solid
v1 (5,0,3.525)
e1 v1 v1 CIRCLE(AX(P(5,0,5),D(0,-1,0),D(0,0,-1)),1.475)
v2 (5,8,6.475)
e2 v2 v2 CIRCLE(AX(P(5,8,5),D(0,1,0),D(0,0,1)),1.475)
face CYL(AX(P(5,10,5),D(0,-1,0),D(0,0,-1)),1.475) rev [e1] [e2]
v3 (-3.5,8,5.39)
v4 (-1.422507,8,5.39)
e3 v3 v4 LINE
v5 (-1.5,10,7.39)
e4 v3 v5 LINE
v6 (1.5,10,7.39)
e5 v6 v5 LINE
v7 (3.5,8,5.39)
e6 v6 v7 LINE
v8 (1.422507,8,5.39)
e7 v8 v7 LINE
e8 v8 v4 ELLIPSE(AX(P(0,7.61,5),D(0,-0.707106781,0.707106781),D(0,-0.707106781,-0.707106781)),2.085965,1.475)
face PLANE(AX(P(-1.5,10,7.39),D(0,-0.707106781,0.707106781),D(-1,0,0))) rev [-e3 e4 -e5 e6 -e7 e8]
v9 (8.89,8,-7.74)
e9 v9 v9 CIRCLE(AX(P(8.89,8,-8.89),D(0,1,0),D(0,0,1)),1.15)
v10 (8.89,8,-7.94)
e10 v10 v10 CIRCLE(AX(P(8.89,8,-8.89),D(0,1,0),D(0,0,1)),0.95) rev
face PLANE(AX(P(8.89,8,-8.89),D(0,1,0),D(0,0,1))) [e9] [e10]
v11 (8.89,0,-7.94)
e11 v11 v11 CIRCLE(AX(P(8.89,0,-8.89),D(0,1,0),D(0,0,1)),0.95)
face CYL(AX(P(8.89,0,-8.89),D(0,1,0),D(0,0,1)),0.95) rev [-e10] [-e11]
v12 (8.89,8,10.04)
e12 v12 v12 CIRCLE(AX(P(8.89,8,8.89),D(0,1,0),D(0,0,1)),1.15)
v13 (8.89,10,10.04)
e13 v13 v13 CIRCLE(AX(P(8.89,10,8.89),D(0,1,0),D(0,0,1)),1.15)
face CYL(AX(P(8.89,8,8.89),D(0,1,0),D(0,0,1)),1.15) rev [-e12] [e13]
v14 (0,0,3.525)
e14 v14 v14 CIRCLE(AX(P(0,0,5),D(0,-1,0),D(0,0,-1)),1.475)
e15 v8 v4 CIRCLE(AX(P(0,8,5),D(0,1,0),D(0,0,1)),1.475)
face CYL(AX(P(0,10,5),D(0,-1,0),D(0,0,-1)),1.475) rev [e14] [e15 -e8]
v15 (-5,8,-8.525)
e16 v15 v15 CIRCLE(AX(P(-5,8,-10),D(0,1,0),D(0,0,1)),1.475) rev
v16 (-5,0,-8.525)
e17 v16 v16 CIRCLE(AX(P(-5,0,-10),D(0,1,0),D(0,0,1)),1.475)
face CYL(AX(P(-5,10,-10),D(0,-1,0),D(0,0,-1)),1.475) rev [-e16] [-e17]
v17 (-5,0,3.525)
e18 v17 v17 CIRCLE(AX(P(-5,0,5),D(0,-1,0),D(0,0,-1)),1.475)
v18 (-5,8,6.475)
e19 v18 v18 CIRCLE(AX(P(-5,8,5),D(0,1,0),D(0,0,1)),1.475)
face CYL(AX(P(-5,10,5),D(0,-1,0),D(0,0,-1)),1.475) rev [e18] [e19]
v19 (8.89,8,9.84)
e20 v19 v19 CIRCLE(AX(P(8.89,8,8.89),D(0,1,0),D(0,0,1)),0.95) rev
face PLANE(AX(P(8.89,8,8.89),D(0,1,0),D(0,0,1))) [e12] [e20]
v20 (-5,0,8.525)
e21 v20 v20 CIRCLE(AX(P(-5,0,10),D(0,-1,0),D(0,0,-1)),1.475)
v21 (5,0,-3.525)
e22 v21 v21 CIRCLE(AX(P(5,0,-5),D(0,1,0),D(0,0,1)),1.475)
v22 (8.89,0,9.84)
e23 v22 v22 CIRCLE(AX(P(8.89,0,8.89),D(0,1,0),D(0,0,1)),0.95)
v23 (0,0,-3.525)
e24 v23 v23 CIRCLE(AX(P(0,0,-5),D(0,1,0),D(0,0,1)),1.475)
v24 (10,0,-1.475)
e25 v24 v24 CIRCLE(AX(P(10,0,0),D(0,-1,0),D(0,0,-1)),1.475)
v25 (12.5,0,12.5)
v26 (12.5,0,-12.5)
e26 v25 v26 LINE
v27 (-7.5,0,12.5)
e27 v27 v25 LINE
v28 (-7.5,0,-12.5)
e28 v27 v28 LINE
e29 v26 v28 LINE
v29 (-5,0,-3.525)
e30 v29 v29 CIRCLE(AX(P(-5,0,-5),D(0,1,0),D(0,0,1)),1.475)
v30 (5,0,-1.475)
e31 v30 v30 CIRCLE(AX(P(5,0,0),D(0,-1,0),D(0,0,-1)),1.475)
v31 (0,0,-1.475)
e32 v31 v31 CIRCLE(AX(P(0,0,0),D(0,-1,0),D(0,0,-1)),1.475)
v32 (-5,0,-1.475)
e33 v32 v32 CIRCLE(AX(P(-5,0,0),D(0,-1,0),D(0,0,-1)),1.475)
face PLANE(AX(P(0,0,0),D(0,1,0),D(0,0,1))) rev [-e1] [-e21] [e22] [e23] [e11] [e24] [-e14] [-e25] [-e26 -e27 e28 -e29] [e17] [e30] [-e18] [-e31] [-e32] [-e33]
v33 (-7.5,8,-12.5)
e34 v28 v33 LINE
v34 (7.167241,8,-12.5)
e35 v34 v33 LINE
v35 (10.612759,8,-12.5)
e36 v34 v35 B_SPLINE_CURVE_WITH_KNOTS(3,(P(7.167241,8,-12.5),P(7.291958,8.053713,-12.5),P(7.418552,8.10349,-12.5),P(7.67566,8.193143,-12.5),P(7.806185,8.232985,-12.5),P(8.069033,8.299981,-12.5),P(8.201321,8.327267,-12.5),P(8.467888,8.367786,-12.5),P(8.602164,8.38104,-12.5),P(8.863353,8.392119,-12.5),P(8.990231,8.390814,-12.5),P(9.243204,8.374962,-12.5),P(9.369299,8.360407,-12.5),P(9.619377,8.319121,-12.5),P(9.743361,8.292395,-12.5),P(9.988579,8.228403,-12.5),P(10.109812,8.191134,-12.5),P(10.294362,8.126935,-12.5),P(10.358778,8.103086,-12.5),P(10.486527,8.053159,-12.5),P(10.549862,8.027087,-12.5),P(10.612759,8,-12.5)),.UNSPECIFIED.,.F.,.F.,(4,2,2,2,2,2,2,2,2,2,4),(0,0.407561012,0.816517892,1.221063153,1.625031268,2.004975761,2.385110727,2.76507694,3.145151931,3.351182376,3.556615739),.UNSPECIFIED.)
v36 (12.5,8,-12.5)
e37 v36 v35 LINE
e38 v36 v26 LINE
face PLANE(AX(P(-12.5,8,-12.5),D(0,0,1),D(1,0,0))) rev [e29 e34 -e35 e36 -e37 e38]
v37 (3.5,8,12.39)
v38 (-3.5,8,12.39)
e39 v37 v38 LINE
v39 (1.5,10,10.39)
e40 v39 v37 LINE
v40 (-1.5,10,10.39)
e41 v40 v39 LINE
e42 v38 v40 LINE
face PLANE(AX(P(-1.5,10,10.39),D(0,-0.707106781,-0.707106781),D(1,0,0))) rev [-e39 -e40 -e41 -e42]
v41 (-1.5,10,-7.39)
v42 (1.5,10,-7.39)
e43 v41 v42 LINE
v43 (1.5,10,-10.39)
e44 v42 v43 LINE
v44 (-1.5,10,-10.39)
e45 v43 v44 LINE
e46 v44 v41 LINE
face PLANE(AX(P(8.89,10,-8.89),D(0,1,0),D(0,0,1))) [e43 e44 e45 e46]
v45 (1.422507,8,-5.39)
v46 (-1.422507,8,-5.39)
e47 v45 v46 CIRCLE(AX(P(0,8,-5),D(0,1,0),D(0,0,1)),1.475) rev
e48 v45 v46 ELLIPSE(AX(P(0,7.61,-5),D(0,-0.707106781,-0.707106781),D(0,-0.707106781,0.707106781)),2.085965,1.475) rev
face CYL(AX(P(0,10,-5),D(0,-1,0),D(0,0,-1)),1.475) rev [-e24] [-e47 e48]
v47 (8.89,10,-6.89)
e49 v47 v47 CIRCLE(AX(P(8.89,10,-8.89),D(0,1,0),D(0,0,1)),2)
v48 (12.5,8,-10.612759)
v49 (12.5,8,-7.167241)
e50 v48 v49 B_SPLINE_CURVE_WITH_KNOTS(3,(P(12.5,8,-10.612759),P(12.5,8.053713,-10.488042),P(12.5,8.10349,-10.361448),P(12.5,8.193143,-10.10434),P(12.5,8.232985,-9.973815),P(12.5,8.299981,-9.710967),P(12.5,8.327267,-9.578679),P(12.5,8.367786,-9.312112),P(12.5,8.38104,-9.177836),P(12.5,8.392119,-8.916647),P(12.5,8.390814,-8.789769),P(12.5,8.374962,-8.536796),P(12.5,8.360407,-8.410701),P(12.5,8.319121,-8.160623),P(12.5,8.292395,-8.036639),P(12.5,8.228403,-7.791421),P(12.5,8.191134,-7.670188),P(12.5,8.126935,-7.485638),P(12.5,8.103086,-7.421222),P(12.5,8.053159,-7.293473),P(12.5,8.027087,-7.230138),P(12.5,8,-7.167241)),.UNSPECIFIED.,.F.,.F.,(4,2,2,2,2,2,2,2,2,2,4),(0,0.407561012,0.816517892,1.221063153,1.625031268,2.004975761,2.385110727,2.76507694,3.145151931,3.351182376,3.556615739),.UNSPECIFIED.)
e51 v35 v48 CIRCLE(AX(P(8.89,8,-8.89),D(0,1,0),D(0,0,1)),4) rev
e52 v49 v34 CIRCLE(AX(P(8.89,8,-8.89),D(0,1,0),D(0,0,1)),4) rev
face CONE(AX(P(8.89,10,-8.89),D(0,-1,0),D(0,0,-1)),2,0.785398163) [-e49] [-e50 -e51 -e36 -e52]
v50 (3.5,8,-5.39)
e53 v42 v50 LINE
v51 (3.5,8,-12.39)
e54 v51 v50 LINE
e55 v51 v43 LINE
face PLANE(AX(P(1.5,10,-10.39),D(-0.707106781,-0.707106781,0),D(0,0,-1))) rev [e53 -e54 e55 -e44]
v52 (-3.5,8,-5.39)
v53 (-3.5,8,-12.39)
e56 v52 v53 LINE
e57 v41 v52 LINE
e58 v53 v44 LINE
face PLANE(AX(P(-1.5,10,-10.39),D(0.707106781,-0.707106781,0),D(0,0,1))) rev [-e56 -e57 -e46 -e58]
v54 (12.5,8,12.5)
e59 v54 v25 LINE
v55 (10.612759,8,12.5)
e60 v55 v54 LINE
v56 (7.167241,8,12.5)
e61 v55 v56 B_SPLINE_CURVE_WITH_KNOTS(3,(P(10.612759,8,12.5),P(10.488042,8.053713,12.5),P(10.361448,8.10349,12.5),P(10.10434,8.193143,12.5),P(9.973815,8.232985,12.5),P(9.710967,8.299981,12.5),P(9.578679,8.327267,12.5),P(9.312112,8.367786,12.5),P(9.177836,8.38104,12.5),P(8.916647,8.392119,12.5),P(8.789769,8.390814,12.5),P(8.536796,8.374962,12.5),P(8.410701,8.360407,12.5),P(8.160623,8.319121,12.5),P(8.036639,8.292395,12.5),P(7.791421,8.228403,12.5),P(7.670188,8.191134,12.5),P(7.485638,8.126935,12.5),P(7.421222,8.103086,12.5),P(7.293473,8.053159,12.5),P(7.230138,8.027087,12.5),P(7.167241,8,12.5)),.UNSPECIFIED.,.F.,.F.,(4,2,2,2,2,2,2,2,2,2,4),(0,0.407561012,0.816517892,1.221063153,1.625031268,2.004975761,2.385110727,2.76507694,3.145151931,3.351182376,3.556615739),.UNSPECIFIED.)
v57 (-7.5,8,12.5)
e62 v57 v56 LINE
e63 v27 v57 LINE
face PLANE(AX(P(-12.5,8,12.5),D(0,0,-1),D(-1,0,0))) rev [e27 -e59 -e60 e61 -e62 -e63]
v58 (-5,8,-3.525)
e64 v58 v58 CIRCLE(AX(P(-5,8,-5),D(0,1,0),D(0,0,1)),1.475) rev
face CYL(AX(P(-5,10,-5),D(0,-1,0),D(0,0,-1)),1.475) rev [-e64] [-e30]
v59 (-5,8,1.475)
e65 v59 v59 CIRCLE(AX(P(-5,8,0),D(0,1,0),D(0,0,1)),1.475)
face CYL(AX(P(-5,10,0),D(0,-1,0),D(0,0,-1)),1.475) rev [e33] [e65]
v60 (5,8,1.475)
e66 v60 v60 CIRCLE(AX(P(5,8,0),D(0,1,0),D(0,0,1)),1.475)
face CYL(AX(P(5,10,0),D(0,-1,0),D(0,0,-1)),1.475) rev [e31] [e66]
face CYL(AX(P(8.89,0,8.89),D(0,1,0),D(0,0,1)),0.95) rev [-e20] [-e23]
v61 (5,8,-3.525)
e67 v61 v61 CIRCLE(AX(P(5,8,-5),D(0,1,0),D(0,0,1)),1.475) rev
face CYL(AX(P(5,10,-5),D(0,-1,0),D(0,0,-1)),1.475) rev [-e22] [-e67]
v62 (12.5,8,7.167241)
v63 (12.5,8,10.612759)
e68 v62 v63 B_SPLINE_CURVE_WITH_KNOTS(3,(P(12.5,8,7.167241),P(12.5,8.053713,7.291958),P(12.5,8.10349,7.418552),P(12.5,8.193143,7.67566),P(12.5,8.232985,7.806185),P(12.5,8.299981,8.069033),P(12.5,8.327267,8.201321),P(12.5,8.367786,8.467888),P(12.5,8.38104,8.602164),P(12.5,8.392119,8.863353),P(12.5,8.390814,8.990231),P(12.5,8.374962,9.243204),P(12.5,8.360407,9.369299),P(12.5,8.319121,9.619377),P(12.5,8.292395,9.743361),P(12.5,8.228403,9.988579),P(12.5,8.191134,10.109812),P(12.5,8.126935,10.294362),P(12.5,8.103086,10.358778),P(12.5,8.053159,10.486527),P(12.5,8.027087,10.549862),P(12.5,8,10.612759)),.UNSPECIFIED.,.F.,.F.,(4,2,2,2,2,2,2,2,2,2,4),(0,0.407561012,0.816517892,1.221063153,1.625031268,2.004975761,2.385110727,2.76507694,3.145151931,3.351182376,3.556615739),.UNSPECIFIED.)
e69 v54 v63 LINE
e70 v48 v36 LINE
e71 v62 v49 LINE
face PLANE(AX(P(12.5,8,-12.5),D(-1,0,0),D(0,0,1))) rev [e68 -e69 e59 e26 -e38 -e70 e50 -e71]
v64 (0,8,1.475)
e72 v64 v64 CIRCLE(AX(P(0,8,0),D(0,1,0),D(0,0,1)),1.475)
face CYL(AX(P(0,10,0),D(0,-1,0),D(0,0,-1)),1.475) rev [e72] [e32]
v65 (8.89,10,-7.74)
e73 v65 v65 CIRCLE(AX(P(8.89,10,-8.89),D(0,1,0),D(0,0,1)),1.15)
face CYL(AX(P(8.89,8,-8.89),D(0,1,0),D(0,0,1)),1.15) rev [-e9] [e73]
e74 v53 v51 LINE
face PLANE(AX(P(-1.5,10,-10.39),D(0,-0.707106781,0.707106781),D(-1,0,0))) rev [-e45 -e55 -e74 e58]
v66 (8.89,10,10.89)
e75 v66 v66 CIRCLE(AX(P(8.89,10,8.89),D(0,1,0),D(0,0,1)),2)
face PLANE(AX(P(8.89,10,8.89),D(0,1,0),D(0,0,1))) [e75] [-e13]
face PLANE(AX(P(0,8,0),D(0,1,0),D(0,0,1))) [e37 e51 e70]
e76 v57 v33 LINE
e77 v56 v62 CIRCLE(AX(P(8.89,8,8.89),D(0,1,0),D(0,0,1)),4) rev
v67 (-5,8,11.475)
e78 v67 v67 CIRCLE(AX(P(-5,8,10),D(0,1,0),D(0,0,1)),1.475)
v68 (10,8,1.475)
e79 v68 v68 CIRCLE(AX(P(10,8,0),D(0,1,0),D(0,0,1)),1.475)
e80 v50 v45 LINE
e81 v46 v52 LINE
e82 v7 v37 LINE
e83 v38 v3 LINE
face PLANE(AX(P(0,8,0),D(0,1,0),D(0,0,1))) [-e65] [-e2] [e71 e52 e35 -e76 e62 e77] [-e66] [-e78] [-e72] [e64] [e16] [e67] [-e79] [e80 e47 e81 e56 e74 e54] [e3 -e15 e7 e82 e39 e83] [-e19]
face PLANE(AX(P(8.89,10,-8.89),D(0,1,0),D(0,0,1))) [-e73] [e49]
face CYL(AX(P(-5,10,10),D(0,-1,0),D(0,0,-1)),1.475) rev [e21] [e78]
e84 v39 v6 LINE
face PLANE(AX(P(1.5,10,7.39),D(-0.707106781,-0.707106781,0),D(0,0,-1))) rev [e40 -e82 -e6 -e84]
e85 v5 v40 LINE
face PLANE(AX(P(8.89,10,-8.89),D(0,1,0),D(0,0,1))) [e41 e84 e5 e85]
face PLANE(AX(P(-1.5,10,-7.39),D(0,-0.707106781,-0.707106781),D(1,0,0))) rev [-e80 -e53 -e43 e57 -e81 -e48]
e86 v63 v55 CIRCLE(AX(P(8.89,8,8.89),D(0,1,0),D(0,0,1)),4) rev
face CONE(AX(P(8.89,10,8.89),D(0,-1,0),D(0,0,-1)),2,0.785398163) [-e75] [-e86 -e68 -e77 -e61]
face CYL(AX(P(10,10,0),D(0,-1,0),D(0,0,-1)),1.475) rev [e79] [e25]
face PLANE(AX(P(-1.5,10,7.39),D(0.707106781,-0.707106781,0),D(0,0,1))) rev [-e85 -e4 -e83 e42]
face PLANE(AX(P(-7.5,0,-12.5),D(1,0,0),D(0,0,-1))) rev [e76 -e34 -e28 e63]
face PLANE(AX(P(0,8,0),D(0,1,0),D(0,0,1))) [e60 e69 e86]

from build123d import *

# Parameters (mm, degrees)
SKETCH1_W                = 25
SKETCH1_H                = 25
BOSS_EXTRUDE1_DEPTH      = 8
SKETCH2_R                = 0.95
CUT_EXTRUDE1_DEPTH       = 20.403607912
BOSS_EXTRUDE2_START      = 2
SKETCH3_R                = 2
SKETCH3_R_2              = 0.95
BOSS_EXTRUDE2_DEPTH      = 2
SKETCH6_W                = 3
SKETCH6_H                = 3
BOSS_EXTRUDE3_DEPTH      = 2
CHAMFER1_SIZE            = 2
SKETCH4_R                = 1.475
CUT_EXTRUDE2_DEPTH       = 21.310096012
LPATTERN1_COUNT          = 5
LPATTERN1_PITCH          = 5
LPATTERN1_COUNT_DIR2     = 3
LPATTERN1_PITCH_DIR2     = 5
MIRROR1_COPY_1_SKETCH_R  = 1.475
MIRROR1_COPY_1_DEPTH     = 21.310096012
MIRROR1_COPY_2_SKETCH_R  = 1.475
MIRROR1_COPY_2_DEPTH     = 21.310096012
MIRROR1_COPY_3_SKETCH_R  = 1.475
MIRROR1_COPY_3_DEPTH     = 21.310096012
MIRROR1_COPY_4_SKETCH_R  = 1.475
MIRROR1_COPY_4_DEPTH     = 21.310096012
MIRROR1_COPY_5_SKETCH_R  = 1.475
MIRROR1_COPY_5_DEPTH     = 21.310096012
MIRROR1_COPY_6_SKETCH_R  = 1.475
MIRROR1_COPY_6_DEPTH     = 21.310096012
MIRROR1_COPY_7_SKETCH_R  = 1.475
MIRROR1_COPY_7_DEPTH     = 21.310096012
MIRROR1_COPY_8_SKETCH_R  = 1.475
MIRROR1_COPY_8_DEPTH     = 21.310096012
MIRROR1_COPY_9_SKETCH_R  = 1.475
MIRROR1_COPY_9_DEPTH     = 21.310096012
MIRROR1_COPY_10_SKETCH_R = 1.475
MIRROR1_COPY_10_DEPTH    = 21.310096012
MIRROR1_COPY_11_SKETCH_R = 1.475
MIRROR1_COPY_11_DEPTH    = 21.310096012
SKETCH5_R                = 1.15
CUT_EXTRUDE3_DEPTH       = 2
SKETCH7_W                = 5
SKETCH7_H                = 25
CUT_EXTRUDE4_DEPTH       = 20.403607912


with BuildPart() as part:
    # Sketch1 → Boss-Extrude1 (new body)
    with BuildSketch(Plane(origin=(0, 0, 0), x_dir=(1, 0, 0), z_dir=(0, 1, 0))):
        Rectangle(SKETCH1_W, SKETCH1_H)
    extrude(amount=BOSS_EXTRUDE1_DEPTH)

    # Sketch2 → Cut-Extrude1 (cut, through all)
    with BuildSketch(Plane(origin=(0, 8, 0), x_dir=(1, 0, 0), z_dir=(0, 1, 0))):
        with Locations(Location((8.89, -8.89, 0), (0, 0, 270))):
            Circle(SKETCH2_R)
        with Locations(Location((8.89, 8.89, 0), (0, 0, 270))):
            Circle(SKETCH2_R)
    extrude(amount=-CUT_EXTRUDE1_DEPTH, mode=Mode.SUBTRACT)

    # Sketch3 → Boss-Extrude2 (add)
    # profile 1 of 2: a face of its own
    with BuildSketch(Plane(origin=(0, 8, 0), x_dir=(1, 0, 0), z_dir=(0, 1, 0)).offset(BOSS_EXTRUDE2_START)):
        with Locations(Location((8.89, 8.89, 0), (0, 0, 270))):
            Circle(SKETCH3_R)
        with Locations(Location((8.89, 8.89, 0), (0, 0, 270))):
            Circle(SKETCH3_R_2, mode=Mode.SUBTRACT)
    # profile 2 of 2: a face of its own
    with BuildSketch(Plane(origin=(0, 8, 0), x_dir=(1, 0, 0), z_dir=(0, 1, 0)).offset(BOSS_EXTRUDE2_START)):
        with Locations(Location((8.89, -8.89, 0), (0, 0, 270))):
            Circle(SKETCH3_R)
        with Locations(Location((8.89, -8.89, 0), (0, 0, 270))):
            Circle(SKETCH3_R_2, mode=Mode.SUBTRACT)
    extrude(amount=-BOSS_EXTRUDE2_DEPTH)

    # Sketch6 → Boss-Extrude3 (add)
    with BuildSketch(Plane(origin=(0, 8, 0), x_dir=(1, 0, 0), z_dir=(0, 1, 0))):
        with Locations((0, 8.89)):
            Rectangle(SKETCH6_W, SKETCH6_H)
        with Locations((0, -8.89)):
            Rectangle(SKETCH6_W, SKETCH6_H)
    extrude(amount=BOSS_EXTRUDE3_DEPTH)

    # Chamfer1
    # the kernel refuses this chamfer: 2 mm, written as the material it adds along each edge
    with BuildSketch(Plane(origin=(8.89, 8, -8.89), x_dir=(0, 0, 1), z_dir=(-1, 0, 0))) as chamfer1_piece_1_section:
        Polygon((2 + CHAMFER1_SIZE, 0), (2, CHAMFER1_SIZE), (2, 0), align=None)
    chamfer1_piece_1 = revolve(axis=Axis((8.89, 8, -8.89), (0, 1, 0)), mode=Mode.PRIVATE)
    chamfer1_piece_1 = split(chamfer1_piece_1, bisect_by=Plane(origin=(8.89, 8.948307197, -12.5), z_dir=(0, 0, 1)), keep=Keep.TOP, mode=Mode.PRIVATE)
    chamfer1_piece_1 = split(chamfer1_piece_1, bisect_by=Plane(origin=(12.5, 8.948307197, -11.894875739), z_dir=(-1, 0, 0)), keep=Keep.TOP, mode=Mode.PRIVATE)
    chamfer1_piece_1 = split(chamfer1_piece_1, bisect_by=Plane(origin=(8.89, 10, -11.894875739), z_dir=(0, -1, 0)), keep=Keep.TOP, mode=Mode.PRIVATE)
    add(chamfer1_piece_1)
    with BuildSketch(Plane(origin=(8.89, 8, 8.89), x_dir=(0, 0, 1), z_dir=(-1, 0, 0))) as chamfer1_piece_2_section:
        Polygon((2 + CHAMFER1_SIZE, 0), (2, CHAMFER1_SIZE), (2, 0), align=None)
    chamfer1_piece_2 = revolve(axis=Axis((8.89, 8, 8.89), (0, 1, 0)), mode=Mode.PRIVATE)
    chamfer1_piece_2 = split(chamfer1_piece_2, bisect_by=Plane(origin=(12.5, 8.948307195, 5.885124263), z_dir=(-1, 0, 0)), keep=Keep.TOP, mode=Mode.PRIVATE)
    chamfer1_piece_2 = split(chamfer1_piece_2, bisect_by=Plane(origin=(8.89, 8.948307195, 12.5), z_dir=(0, 0, -1)), keep=Keep.TOP, mode=Mode.PRIVATE)
    chamfer1_piece_2 = split(chamfer1_piece_2, bisect_by=Plane(origin=(8.89, 10, 5.885124263), z_dir=(0, -1, 0)), keep=Keep.TOP, mode=Mode.PRIVATE)
    add(chamfer1_piece_2)
    with BuildSketch(Plane(origin=(-1.5, 8, 7.39), x_dir=(0, -0.027495876610586487, -0.9996219169112968), z_dir=(1, 0, 0))) as chamfer1_piece_3_section:
        Polygon((CHAMFER1_SIZE * 0.999621916911, CHAMFER1_SIZE * 0.0274958766106), (-CHAMFER1_SIZE * 0.0274958766106, CHAMFER1_SIZE * 0.999621916911), (0, 0), align=None)
    chamfer1_piece_3 = extrude(amount=3, mode=Mode.PRIVATE)
    chamfer1_piece_3 = split(chamfer1_piece_3, bisect_by=Plane(origin=(0, 10, 6.729191691), z_dir=(0, -1, 0)), keep=Keep.TOP, mode=Mode.PRIVATE)
    add(chamfer1_piece_3)
    with BuildSketch(Plane(origin=(1.5, 8, 7.39), x_dir=(0.9996219169112968, -0.027495876610586494, 0), z_dir=(0, 0, 1))) as chamfer1_piece_4_section:
        Polygon((CHAMFER1_SIZE * 0.999621916911, CHAMFER1_SIZE * 0.0274958766106), (-CHAMFER1_SIZE * 0.0274958766106, CHAMFER1_SIZE * 0.999621916911), (0, 0), align=None)
    chamfer1_piece_4 = extrude(amount=3, mode=Mode.PRIVATE)
    chamfer1_piece_4 = split(chamfer1_piece_4, bisect_by=Plane(origin=(2.160808309, 10, 8.89), z_dir=(0, -1, 0)), keep=Keep.TOP, mode=Mode.PRIVATE)
    add(chamfer1_piece_4)
    with BuildSketch(Plane(origin=(1.5, 8, 10.39), x_dir=(0, -0.027495876610586487, 0.9996219169112968), z_dir=(-1, 0, 0))) as chamfer1_piece_5_section:
        Polygon((CHAMFER1_SIZE * 0.999621916911, CHAMFER1_SIZE * 0.0274958766106), (-CHAMFER1_SIZE * 0.0274958766106, CHAMFER1_SIZE * 0.999621916911), (0, 0), align=None)
    chamfer1_piece_5 = extrude(amount=3, mode=Mode.PRIVATE)
    chamfer1_piece_5 = split(chamfer1_piece_5, bisect_by=Plane(origin=(0, 10, 11.050808309), z_dir=(0, -1, 0)), keep=Keep.TOP, mode=Mode.PRIVATE)
    add(chamfer1_piece_5)
    with BuildSketch(Plane(origin=(-1.5, 8, 10.39), x_dir=(-0.9996219169112968, -0.027495876610586497, 0), z_dir=(0, 0, -1))) as chamfer1_piece_6_section:
        Polygon((CHAMFER1_SIZE * 0.999621916911, CHAMFER1_SIZE * 0.0274958766106), (-CHAMFER1_SIZE * 0.0274958766106, CHAMFER1_SIZE * 0.999621916911), (0, 0), align=None)
    chamfer1_piece_6 = extrude(amount=3, mode=Mode.PRIVATE)
    chamfer1_piece_6 = split(chamfer1_piece_6, bisect_by=Plane(origin=(-2.160808309, 10, 8.89), z_dir=(0, -1, 0)), keep=Keep.TOP, mode=Mode.PRIVATE)
    add(chamfer1_piece_6)
    with BuildSketch(Plane(origin=(1.5, 8, -10.39), x_dir=(0.9996219169112968, -0.027495876610586494, 0), z_dir=(0, 0, 1))) as chamfer1_piece_7_section:
        Polygon((CHAMFER1_SIZE * 0.999621916911, CHAMFER1_SIZE * 0.0274958766106), (-CHAMFER1_SIZE * 0.0274958766106, CHAMFER1_SIZE * 0.999621916911), (0, 0), align=None)
    chamfer1_piece_7 = extrude(amount=3, mode=Mode.PRIVATE)
    chamfer1_piece_7 = split(chamfer1_piece_7, bisect_by=Plane(origin=(2.160808309, 10, -8.89), z_dir=(0, -1, 0)), keep=Keep.TOP, mode=Mode.PRIVATE)
    add(chamfer1_piece_7)
    with BuildSketch(Plane(origin=(-1.5, 8, -10.39), x_dir=(0, -0.027495876610586487, -0.9996219169112968), z_dir=(1, 0, 0))) as chamfer1_piece_8_section:
        Polygon((CHAMFER1_SIZE * 0.999621916911, CHAMFER1_SIZE * 0.0274958766106), (-CHAMFER1_SIZE * 0.0274958766106, CHAMFER1_SIZE * 0.999621916911), (0, 0), align=None)
    chamfer1_piece_8 = extrude(amount=3, mode=Mode.PRIVATE)
    chamfer1_piece_8 = split(chamfer1_piece_8, bisect_by=Plane(origin=(0, 10, -11.050808309), z_dir=(0, -1, 0)), keep=Keep.TOP, mode=Mode.PRIVATE)
    add(chamfer1_piece_8)
    with BuildSketch(Plane(origin=(-1.5, 8, -7.39), x_dir=(-0.9996219169112968, -0.027495876610586494, 0), z_dir=(0, 0, -1))) as chamfer1_piece_9_section:
        Polygon((CHAMFER1_SIZE * 0.999621916911, CHAMFER1_SIZE * 0.0274958766106), (-CHAMFER1_SIZE * 0.0274958766106, CHAMFER1_SIZE * 0.999621916911), (0, 0), align=None)
    chamfer1_piece_9 = extrude(amount=3, mode=Mode.PRIVATE)
    chamfer1_piece_9 = split(chamfer1_piece_9, bisect_by=Plane(origin=(-2.160808309, 10, -8.89), z_dir=(0, -1, 0)), keep=Keep.TOP, mode=Mode.PRIVATE)
    add(chamfer1_piece_9)
    with BuildSketch(Plane(origin=(1.5, 8, -7.39), x_dir=(0, -0.027495876610586487, 0.9996219169112968), z_dir=(-1, 0, 0))) as chamfer1_piece_10_section:
        Polygon((CHAMFER1_SIZE * 0.999621916911, CHAMFER1_SIZE * 0.0274958766106), (-CHAMFER1_SIZE * 0.0274958766106, CHAMFER1_SIZE * 0.999621916911), (0, 0), align=None)
    chamfer1_piece_10 = extrude(amount=3, mode=Mode.PRIVATE)
    chamfer1_piece_10 = split(chamfer1_piece_10, bisect_by=Plane(origin=(0, 10, -6.729191691), z_dir=(0, -1, 0)), keep=Keep.TOP, mode=Mode.PRIVATE)
    add(chamfer1_piece_10)
    with BuildSketch(Plane(origin=(-6.643365976, 8, 7.39), x_dir=(0, -0.027495876610586487, -0.9996219169112968), z_dir=(1, 0, 0))) as chamfer1_piece_11a_section:
        Polygon((CHAMFER1_SIZE * 0.999621916911, CHAMFER1_SIZE * 0.0274958766106), (-CHAMFER1_SIZE * 0.0274958766106, CHAMFER1_SIZE * 0.999621916911), (0, 0), align=None)
    chamfer1_piece_11a = extrude(amount=8.143365976, mode=Mode.PRIVATE)
    chamfer1_piece_11a = split(chamfer1_piece_11a, bisect_by=Plane(origin=(-1.5, 8.657268668, 6.729191691), z_dir=(-1, 0, 0)), keep=Keep.TOP, mode=Mode.PRIVATE)
    chamfer1_piece_11a = split(chamfer1_piece_11a, bisect_by=Plane(origin=(-4.071682988, 10, 6.729191691), z_dir=(0, -1, 0)), keep=Keep.TOP, mode=Mode.PRIVATE)
    with BuildSketch(Plane(origin=(-1.5, 8, 10.39), x_dir=(-0.9996219169112968, -0.027495876610586497, 0), z_dir=(0, 0, -1))) as chamfer1_piece_11b_section:
        Polygon((CHAMFER1_SIZE * 0.999621916911, CHAMFER1_SIZE * 0.0274958766106), (-CHAMFER1_SIZE * 0.0274958766106, CHAMFER1_SIZE * 0.999621916911), (0, 0), align=None)
    chamfer1_piece_11b = extrude(amount=8.143365976, mode=Mode.PRIVATE)
    chamfer1_piece_11b = split(chamfer1_piece_11b, bisect_by=Plane(origin=(-2.160808309, 8.657268668, 7.39), z_dir=(0, 0, -1)), keep=Keep.TOP, mode=Mode.PRIVATE)
    chamfer1_piece_11b = split(chamfer1_piece_11b, bisect_by=Plane(origin=(-2.160808309, 10, 4.818317012), z_dir=(0, -1, 0)), keep=Keep.TOP, mode=Mode.PRIVATE)
    chamfer1_piece_11 = chamfer1_piece_11a & chamfer1_piece_11b
    add(chamfer1_piece_11)
    with BuildSketch(Plane(origin=(-1.5, 8, 7.39), x_dir=(0, -0.027495876610586487, -0.9996219169112968), z_dir=(1, 0, 0))) as chamfer1_piece_12a_section:
        Polygon((CHAMFER1_SIZE * 0.999621916911, CHAMFER1_SIZE * 0.0274958766106), (-CHAMFER1_SIZE * 0.0274958766106, CHAMFER1_SIZE * 0.999621916911), (0, 0), align=None)
    chamfer1_piece_12a = extrude(amount=8.143365976, mode=Mode.PRIVATE)
    chamfer1_piece_12a = split(chamfer1_piece_12a, bisect_by=Plane(origin=(1.5, 8.657268668, 6.729191691), z_dir=(1, 0, 0)), keep=Keep.TOP, mode=Mode.PRIVATE)
    chamfer1_piece_12a = split(chamfer1_piece_12a, bisect_by=Plane(origin=(4.071682988, 10, 6.729191691), z_dir=(0, -1, 0)), keep=Keep.TOP, mode=Mode.PRIVATE)
    with BuildSketch(Plane(origin=(1.5, 8, 2.246634024), x_dir=(0.9996219169112968, -0.027495876610586494, 0), z_dir=(0, 0, 1))) as chamfer1_piece_12b_section:
        Polygon((CHAMFER1_SIZE * 0.999621916911, CHAMFER1_SIZE * 0.0274958766106), (-CHAMFER1_SIZE * 0.0274958766106, CHAMFER1_SIZE * 0.999621916911), (0, 0), align=None)
    chamfer1_piece_12b = extrude(amount=8.143365976, mode=Mode.PRIVATE)
    chamfer1_piece_12b = split(chamfer1_piece_12b, bisect_by=Plane(origin=(2.160808309, 8.657268668, 7.39), z_dir=(0, 0, -1)), keep=Keep.TOP, mode=Mode.PRIVATE)
    chamfer1_piece_12b = split(chamfer1_piece_12b, bisect_by=Plane(origin=(2.160808309, 10, 4.818317012), z_dir=(0, -1, 0)), keep=Keep.TOP, mode=Mode.PRIVATE)
    chamfer1_piece_12 = chamfer1_piece_12a & chamfer1_piece_12b
    add(chamfer1_piece_12)
    with BuildSketch(Plane(origin=(1.5, 8, 7.39), x_dir=(0.9996219169112968, -0.027495876610586494, 0), z_dir=(0, 0, 1))) as chamfer1_piece_13a_section:
        Polygon((CHAMFER1_SIZE * 0.999621916911, CHAMFER1_SIZE * 0.0274958766106), (-CHAMFER1_SIZE * 0.0274958766106, CHAMFER1_SIZE * 0.999621916911), (0, 0), align=None)
    chamfer1_piece_13a = extrude(amount=8.143365976, mode=Mode.PRIVATE)
    chamfer1_piece_13a = split(chamfer1_piece_13a, bisect_by=Plane(origin=(2.160808309, 8.657268668, 12.5), z_dir=(0, 0, -1)), keep=Keep.TOP, mode=Mode.PRIVATE)
    chamfer1_piece_13a = split(chamfer1_piece_13a, bisect_by=Plane(origin=(2.160808309, 8.657268668, 10.39), z_dir=(0, 0, 1)), keep=Keep.TOP, mode=Mode.PRIVATE)
    chamfer1_piece_13a = split(chamfer1_piece_13a, bisect_by=Plane(origin=(2.160808309, 10, 11.445), z_dir=(0, -1, 0)), keep=Keep.TOP, mode=Mode.PRIVATE)
    with BuildSketch(Plane(origin=(6.643365976, 8, 10.39), x_dir=(0, -0.027495876610586487, 0.9996219169112968), z_dir=(-1, 0, 0))) as chamfer1_piece_13b_section:
        Polygon((CHAMFER1_SIZE * 0.999621916911, CHAMFER1_SIZE * 0.0274958766106), (-CHAMFER1_SIZE * 0.0274958766106, CHAMFER1_SIZE * 0.999621916911), (0, 0), align=None)
    chamfer1_piece_13b = extrude(amount=8.143365976, mode=Mode.PRIVATE)
    chamfer1_piece_13b = split(chamfer1_piece_13b, bisect_by=Plane(origin=(1.5, 8.657268668, 11.050808309), z_dir=(1, 0, 0)), keep=Keep.TOP, mode=Mode.PRIVATE)
    chamfer1_piece_13b = split(chamfer1_piece_13b, bisect_by=Plane(origin=(4.071682988, 10, 11.050808309), z_dir=(0, -1, 0)), keep=Keep.TOP, mode=Mode.PRIVATE)
    chamfer1_piece_13 = chamfer1_piece_13a & chamfer1_piece_13b
    add(chamfer1_piece_13)
    with BuildSketch(Plane(origin=(1.5, 8, 10.39), x_dir=(0, -0.027495876610586487, 0.9996219169112968), z_dir=(-1, 0, 0))) as chamfer1_piece_14a_section:
        Polygon((CHAMFER1_SIZE * 0.999621916911, CHAMFER1_SIZE * 0.0274958766106), (-CHAMFER1_SIZE * 0.0274958766106, CHAMFER1_SIZE * 0.999621916911), (0, 0), align=None)
    chamfer1_piece_14a = extrude(amount=8.143365976, mode=Mode.PRIVATE)
    chamfer1_piece_14a = split(chamfer1_piece_14a, bisect_by=Plane(origin=(-1.5, 8.657268668, 11.050808309), z_dir=(-1, 0, 0)), keep=Keep.TOP, mode=Mode.PRIVATE)
    chamfer1_piece_14a = split(chamfer1_piece_14a, bisect_by=Plane(origin=(-4.071682988, 10, 11.050808309), z_dir=(0, -1, 0)), keep=Keep.TOP, mode=Mode.PRIVATE)
    with BuildSketch(Plane(origin=(-1.5, 8, 15.533365976), x_dir=(-0.9996219169112968, -0.027495876610586487, 0), z_dir=(0, 0, -1))) as chamfer1_piece_14b_section:
        Polygon((CHAMFER1_SIZE * 0.999621916911, CHAMFER1_SIZE * 0.0274958766106), (-CHAMFER1_SIZE * 0.0274958766106, CHAMFER1_SIZE * 0.999621916911), (0, 0), align=None)
    chamfer1_piece_14b = extrude(amount=8.143365976, mode=Mode.PRIVATE)
    chamfer1_piece_14b = split(chamfer1_piece_14b, bisect_by=Plane(origin=(-2.160808309, 8.657268668, 12.5), z_dir=(0, 0, -1)), keep=Keep.TOP, mode=Mode.PRIVATE)
    chamfer1_piece_14b = split(chamfer1_piece_14b, bisect_by=Plane(origin=(-2.160808309, 8.657268668, 10.39), z_dir=(0, 0, 1)), keep=Keep.TOP, mode=Mode.PRIVATE)
    chamfer1_piece_14b = split(chamfer1_piece_14b, bisect_by=Plane(origin=(-2.160808309, 10, 11.445), z_dir=(0, -1, 0)), keep=Keep.TOP, mode=Mode.PRIVATE)
    chamfer1_piece_14 = chamfer1_piece_14a & chamfer1_piece_14b
    add(chamfer1_piece_14)
    with BuildSketch(Plane(origin=(-1.5, 8, -10.39), x_dir=(0, -0.027495876610586487, -0.9996219169112968), z_dir=(1, 0, 0))) as chamfer1_piece_15a_section:
        Polygon((CHAMFER1_SIZE * 0.999621916911, CHAMFER1_SIZE * 0.0274958766106), (-CHAMFER1_SIZE * 0.0274958766106, CHAMFER1_SIZE * 0.999621916911), (0, 0), align=None)
    chamfer1_piece_15a = extrude(amount=8.143365976, mode=Mode.PRIVATE)
    chamfer1_piece_15a = split(chamfer1_piece_15a, bisect_by=Plane(origin=(1.5, 8.657268668, -11.050808309), z_dir=(1, 0, 0)), keep=Keep.TOP, mode=Mode.PRIVATE)
    chamfer1_piece_15a = split(chamfer1_piece_15a, bisect_by=Plane(origin=(4.071682988, 10, -11.050808309), z_dir=(0, -1, 0)), keep=Keep.TOP, mode=Mode.PRIVATE)
    with BuildSketch(Plane(origin=(1.5, 8, -15.533365976), x_dir=(0.9996219169112968, -0.027495876610586497, 0), z_dir=(0, 0, 1))) as chamfer1_piece_15b_section:
        Polygon((CHAMFER1_SIZE * 0.999621916911, CHAMFER1_SIZE * 0.0274958766106), (-CHAMFER1_SIZE * 0.0274958766106, CHAMFER1_SIZE * 0.999621916911), (0, 0), align=None)
    chamfer1_piece_15b = extrude(amount=8.143365976, mode=Mode.PRIVATE)
    chamfer1_piece_15b = split(chamfer1_piece_15b, bisect_by=Plane(origin=(2.160808309, 8.657268668, -12.5), z_dir=(0, 0, 1)), keep=Keep.TOP, mode=Mode.PRIVATE)
    chamfer1_piece_15b = split(chamfer1_piece_15b, bisect_by=Plane(origin=(2.160808309, 8.657268668, -10.39), z_dir=(0, 0, -1)), keep=Keep.TOP, mode=Mode.PRIVATE)
    chamfer1_piece_15b = split(chamfer1_piece_15b, bisect_by=Plane(origin=(2.160808309, 10, -11.445), z_dir=(0, -1, 0)), keep=Keep.TOP, mode=Mode.PRIVATE)
    chamfer1_piece_15 = chamfer1_piece_15a & chamfer1_piece_15b
    add(chamfer1_piece_15)
    with BuildSketch(Plane(origin=(1.5, 8, -10.39), x_dir=(0.9996219169112968, -0.027495876610586494, 0), z_dir=(0, 0, 1))) as chamfer1_piece_16a_section:
        Polygon((CHAMFER1_SIZE * 0.999621916911, CHAMFER1_SIZE * 0.0274958766106), (-CHAMFER1_SIZE * 0.0274958766106, CHAMFER1_SIZE * 0.999621916911), (0, 0), align=None)
    chamfer1_piece_16a = extrude(amount=8.143365976, mode=Mode.PRIVATE)
    chamfer1_piece_16a = split(chamfer1_piece_16a, bisect_by=Plane(origin=(2.160808309, 8.657268668, -7.39), z_dir=(0, 0, 1)), keep=Keep.TOP, mode=Mode.PRIVATE)
    chamfer1_piece_16a = split(chamfer1_piece_16a, bisect_by=Plane(origin=(2.160808309, 10, -4.818317012), z_dir=(0, -1, 0)), keep=Keep.TOP, mode=Mode.PRIVATE)
    with BuildSketch(Plane(origin=(6.643365976, 8, -7.39), x_dir=(0, -0.027495876610586487, 0.9996219169112968), z_dir=(-1, 0, 0))) as chamfer1_piece_16b_section:
        Polygon((CHAMFER1_SIZE * 0.999621916911, CHAMFER1_SIZE * 0.0274958766106), (-CHAMFER1_SIZE * 0.0274958766106, CHAMFER1_SIZE * 0.999621916911), (0, 0), align=None)
    chamfer1_piece_16b = extrude(amount=8.143365976, mode=Mode.PRIVATE)
    chamfer1_piece_16b = split(chamfer1_piece_16b, bisect_by=Plane(origin=(1.5, 8.657268668, -6.729191691), z_dir=(1, 0, 0)), keep=Keep.TOP, mode=Mode.PRIVATE)
    chamfer1_piece_16b = split(chamfer1_piece_16b, bisect_by=Plane(origin=(4.071682988, 10, -6.729191691), z_dir=(0, -1, 0)), keep=Keep.TOP, mode=Mode.PRIVATE)
    chamfer1_piece_16 = chamfer1_piece_16a & chamfer1_piece_16b
    add(chamfer1_piece_16)
    with BuildSketch(Plane(origin=(-6.643365976, 8, -10.39), x_dir=(0, -0.027495876610586487, -0.9996219169112968), z_dir=(1, 0, 0))) as chamfer1_piece_17a_section:
        Polygon((CHAMFER1_SIZE * 0.999621916911, CHAMFER1_SIZE * 0.0274958766106), (-CHAMFER1_SIZE * 0.0274958766106, CHAMFER1_SIZE * 0.999621916911), (0, 0), align=None)
    chamfer1_piece_17a = extrude(amount=8.143365976, mode=Mode.PRIVATE)
    chamfer1_piece_17a = split(chamfer1_piece_17a, bisect_by=Plane(origin=(-1.5, 8.657268668, -11.050808309), z_dir=(-1, 0, 0)), keep=Keep.TOP, mode=Mode.PRIVATE)
    chamfer1_piece_17a = split(chamfer1_piece_17a, bisect_by=Plane(origin=(-4.071682988, 10, -11.050808309), z_dir=(0, -1, 0)), keep=Keep.TOP, mode=Mode.PRIVATE)
    with BuildSketch(Plane(origin=(-1.5, 8, -7.39), x_dir=(-0.9996219169112968, -0.027495876610586494, 0), z_dir=(0, 0, -1))) as chamfer1_piece_17b_section:
        Polygon((CHAMFER1_SIZE * 0.999621916911, CHAMFER1_SIZE * 0.0274958766106), (-CHAMFER1_SIZE * 0.0274958766106, CHAMFER1_SIZE * 0.999621916911), (0, 0), align=None)
    chamfer1_piece_17b = extrude(amount=8.143365976, mode=Mode.PRIVATE)
    chamfer1_piece_17b = split(chamfer1_piece_17b, bisect_by=Plane(origin=(-2.160808309, 8.657268668, -12.5), z_dir=(0, 0, 1)), keep=Keep.TOP, mode=Mode.PRIVATE)
    chamfer1_piece_17b = split(chamfer1_piece_17b, bisect_by=Plane(origin=(-2.160808309, 8.657268668, -10.39), z_dir=(0, 0, -1)), keep=Keep.TOP, mode=Mode.PRIVATE)
    chamfer1_piece_17b = split(chamfer1_piece_17b, bisect_by=Plane(origin=(-2.160808309, 10, -11.445), z_dir=(0, -1, 0)), keep=Keep.TOP, mode=Mode.PRIVATE)
    chamfer1_piece_17 = chamfer1_piece_17a & chamfer1_piece_17b
    add(chamfer1_piece_17)
    with BuildSketch(Plane(origin=(1.5, 8, -7.39), x_dir=(0, -0.027495876610586487, 0.9996219169112968), z_dir=(-1, 0, 0))) as chamfer1_piece_18a_section:
        Polygon((CHAMFER1_SIZE * 0.999621916911, CHAMFER1_SIZE * 0.0274958766106), (-CHAMFER1_SIZE * 0.0274958766106, CHAMFER1_SIZE * 0.999621916911), (0, 0), align=None)
    chamfer1_piece_18a = extrude(amount=8.143365976, mode=Mode.PRIVATE)
    chamfer1_piece_18a = split(chamfer1_piece_18a, bisect_by=Plane(origin=(-1.5, 8.657268668, -6.729191691), z_dir=(-1, 0, 0)), keep=Keep.TOP, mode=Mode.PRIVATE)
    chamfer1_piece_18a = split(chamfer1_piece_18a, bisect_by=Plane(origin=(-4.071682988, 10, -6.729191691), z_dir=(0, -1, 0)), keep=Keep.TOP, mode=Mode.PRIVATE)
    with BuildSketch(Plane(origin=(-1.5, 8, -2.246634024), x_dir=(-0.9996219169112968, -0.027495876610586487, 0), z_dir=(0, 0, -1))) as chamfer1_piece_18b_section:
        Polygon((CHAMFER1_SIZE * 0.999621916911, CHAMFER1_SIZE * 0.0274958766106), (-CHAMFER1_SIZE * 0.0274958766106, CHAMFER1_SIZE * 0.999621916911), (0, 0), align=None)
    chamfer1_piece_18b = extrude(amount=8.143365976, mode=Mode.PRIVATE)
    chamfer1_piece_18b = split(chamfer1_piece_18b, bisect_by=Plane(origin=(-2.160808309, 8.657268668, -7.39), z_dir=(0, 0, 1)), keep=Keep.TOP, mode=Mode.PRIVATE)
    chamfer1_piece_18b = split(chamfer1_piece_18b, bisect_by=Plane(origin=(-2.160808309, 10, -4.818317012), z_dir=(0, -1, 0)), keep=Keep.TOP, mode=Mode.PRIVATE)
    chamfer1_piece_18 = chamfer1_piece_18a & chamfer1_piece_18b
    add(chamfer1_piece_18)

    # Sketch4 → Cut-Extrude2 (cut, through all)
    with BuildSketch(Plane.XZ):
        with Locations(Location((-10, 0, 0), (0, 0, 270))):
            Circle(SKETCH4_R)
    cut_extrude2 = extrude(amount=-CUT_EXTRUDE2_DEPTH, mode=Mode.SUBTRACT)

    # LPattern1: Cut-Extrude2 5 × 3, 4 skipped
    with Locations(*[(i * LPATTERN1_PITCH, 0, j * LPATTERN1_PITCH_DIR2) for i in range(LPATTERN1_COUNT) for j in range(LPATTERN1_COUNT_DIR2) if (i, j) not in ((0, 0), (2, 2), (3, 2), (4, 1), (4, 2))]):
        add(cut_extrude2, mode=Mode.SUBTRACT)

    # Mirror1 copy 1 sketch → Mirror1 copy 1 (cut, through all)
    with BuildSketch(Plane(origin=(0, 0, -5), x_dir=(1, 0, 0), z_dir=(0, -1, 0))):
        with Locations((-10, 0)):
            Circle(MIRROR1_COPY_1_SKETCH_R)
    extrude(amount=-MIRROR1_COPY_1_DEPTH, mode=Mode.SUBTRACT)

    # Mirror1 copy 2 sketch → Mirror1 copy 2 (cut, through all)
    with BuildSketch(Plane(origin=(0, 0, -10), x_dir=(1, 0, 0), z_dir=(0, -1, 0))):
        with Locations((-10, 0)):
            Circle(MIRROR1_COPY_2_SKETCH_R)
    extrude(amount=-MIRROR1_COPY_2_DEPTH, mode=Mode.SUBTRACT)

    # Mirror1 copy 3 sketch → Mirror1 copy 3 (cut, through all)
    with BuildSketch(Plane(origin=(5, 0, 0), x_dir=(1, 0, 0), z_dir=(0, -1, 0))):
        with Locations((-10, 0)):
            Circle(MIRROR1_COPY_3_SKETCH_R)
    extrude(amount=-MIRROR1_COPY_3_DEPTH, mode=Mode.SUBTRACT)

    # Mirror1 copy 4 sketch → Mirror1 copy 4 (cut, through all)
    with BuildSketch(Plane(origin=(5, 0, -5), x_dir=(1, 0, 0), z_dir=(0, -1, 0))):
        with Locations((-10, 0)):
            Circle(MIRROR1_COPY_4_SKETCH_R)
    extrude(amount=-MIRROR1_COPY_4_DEPTH, mode=Mode.SUBTRACT)

    # Mirror1 copy 5 sketch → Mirror1 copy 5 (cut, through all)
    with BuildSketch(Plane(origin=(5, 0, -10), x_dir=(1, 0, 0), z_dir=(0, -1, 0))):
        with Locations((-10, 0)):
            Circle(MIRROR1_COPY_5_SKETCH_R)
    extrude(amount=-MIRROR1_COPY_5_DEPTH, mode=Mode.SUBTRACT)

    # Mirror1 copy 6 sketch → Mirror1 copy 6 (cut, through all)
    with BuildSketch(Plane(origin=(10, 0, 0), x_dir=(1, 0, 0), z_dir=(0, -1, 0))):
        with Locations((-10, 0)):
            Circle(MIRROR1_COPY_6_SKETCH_R)
    extrude(amount=-MIRROR1_COPY_6_DEPTH, mode=Mode.SUBTRACT)

    # Mirror1 copy 7 sketch → Mirror1 copy 7 (cut, through all)
    with BuildSketch(Plane(origin=(10, 0, -5), x_dir=(1, 0, 0), z_dir=(0, -1, 0))):
        with Locations((-10, 0)):
            Circle(MIRROR1_COPY_7_SKETCH_R)
    extrude(amount=-MIRROR1_COPY_7_DEPTH, mode=Mode.SUBTRACT)

    # Mirror1 copy 8 sketch → Mirror1 copy 8 (cut, through all)
    with BuildSketch(Plane(origin=(15, 0, 0), x_dir=(1, 0, 0), z_dir=(0, -1, 0))):
        with Locations((-10, 0)):
            Circle(MIRROR1_COPY_8_SKETCH_R)
    extrude(amount=-MIRROR1_COPY_8_DEPTH, mode=Mode.SUBTRACT)

    # Mirror1 copy 9 sketch → Mirror1 copy 9 (cut, through all)
    with BuildSketch(Plane(origin=(15, 0, -5), x_dir=(1, 0, 0), z_dir=(0, -1, 0))):
        with Locations((-10, 0)):
            Circle(MIRROR1_COPY_9_SKETCH_R)
    extrude(amount=-MIRROR1_COPY_9_DEPTH, mode=Mode.SUBTRACT)

    # Mirror1 copy 10 sketch → Mirror1 copy 10 (cut, through all)
    with BuildSketch(Plane(origin=(20, 0, 0), x_dir=(1, 0, 0), z_dir=(0, -1, 0))):
        with Locations((-10, 0)):
            Circle(MIRROR1_COPY_10_SKETCH_R)
    extrude(amount=-MIRROR1_COPY_10_DEPTH, mode=Mode.SUBTRACT)

    # Mirror1 copy 11 sketch → Mirror1 copy 11 (cut, through all)
    with BuildSketch(Plane.XZ):
        with Locations((-10, 0)):
            Circle(MIRROR1_COPY_11_SKETCH_R)
    extrude(amount=-MIRROR1_COPY_11_DEPTH, mode=Mode.SUBTRACT)

    # Sketch5 → Cut-Extrude3 (cut)
    with BuildSketch(Plane(origin=(0, 10, 0), x_dir=(1, 0, 0), z_dir=(0, 1, 0))):
        with Locations(Location((8.89, 8.89, 0), (0, 0, 270))):
            Circle(SKETCH5_R)
        with Locations(Location((8.89, -8.89, 0), (0, 0, 270))):
            Circle(SKETCH5_R)
    extrude(amount=-CUT_EXTRUDE3_DEPTH, mode=Mode.SUBTRACT)

    # Sketch7 → Cut-Extrude4 (cut, through all)
    with BuildSketch(Plane(origin=(0, 8, 0), x_dir=(1, 0, 0), z_dir=(0, 1, 0))):
        with Locations((-10, 0)):
            Rectangle(SKETCH7_W, SKETCH7_H)
    extrude(amount=-CUT_EXTRUDE4_DEPTH, mode=Mode.SUBTRACT)


solid = part.part
